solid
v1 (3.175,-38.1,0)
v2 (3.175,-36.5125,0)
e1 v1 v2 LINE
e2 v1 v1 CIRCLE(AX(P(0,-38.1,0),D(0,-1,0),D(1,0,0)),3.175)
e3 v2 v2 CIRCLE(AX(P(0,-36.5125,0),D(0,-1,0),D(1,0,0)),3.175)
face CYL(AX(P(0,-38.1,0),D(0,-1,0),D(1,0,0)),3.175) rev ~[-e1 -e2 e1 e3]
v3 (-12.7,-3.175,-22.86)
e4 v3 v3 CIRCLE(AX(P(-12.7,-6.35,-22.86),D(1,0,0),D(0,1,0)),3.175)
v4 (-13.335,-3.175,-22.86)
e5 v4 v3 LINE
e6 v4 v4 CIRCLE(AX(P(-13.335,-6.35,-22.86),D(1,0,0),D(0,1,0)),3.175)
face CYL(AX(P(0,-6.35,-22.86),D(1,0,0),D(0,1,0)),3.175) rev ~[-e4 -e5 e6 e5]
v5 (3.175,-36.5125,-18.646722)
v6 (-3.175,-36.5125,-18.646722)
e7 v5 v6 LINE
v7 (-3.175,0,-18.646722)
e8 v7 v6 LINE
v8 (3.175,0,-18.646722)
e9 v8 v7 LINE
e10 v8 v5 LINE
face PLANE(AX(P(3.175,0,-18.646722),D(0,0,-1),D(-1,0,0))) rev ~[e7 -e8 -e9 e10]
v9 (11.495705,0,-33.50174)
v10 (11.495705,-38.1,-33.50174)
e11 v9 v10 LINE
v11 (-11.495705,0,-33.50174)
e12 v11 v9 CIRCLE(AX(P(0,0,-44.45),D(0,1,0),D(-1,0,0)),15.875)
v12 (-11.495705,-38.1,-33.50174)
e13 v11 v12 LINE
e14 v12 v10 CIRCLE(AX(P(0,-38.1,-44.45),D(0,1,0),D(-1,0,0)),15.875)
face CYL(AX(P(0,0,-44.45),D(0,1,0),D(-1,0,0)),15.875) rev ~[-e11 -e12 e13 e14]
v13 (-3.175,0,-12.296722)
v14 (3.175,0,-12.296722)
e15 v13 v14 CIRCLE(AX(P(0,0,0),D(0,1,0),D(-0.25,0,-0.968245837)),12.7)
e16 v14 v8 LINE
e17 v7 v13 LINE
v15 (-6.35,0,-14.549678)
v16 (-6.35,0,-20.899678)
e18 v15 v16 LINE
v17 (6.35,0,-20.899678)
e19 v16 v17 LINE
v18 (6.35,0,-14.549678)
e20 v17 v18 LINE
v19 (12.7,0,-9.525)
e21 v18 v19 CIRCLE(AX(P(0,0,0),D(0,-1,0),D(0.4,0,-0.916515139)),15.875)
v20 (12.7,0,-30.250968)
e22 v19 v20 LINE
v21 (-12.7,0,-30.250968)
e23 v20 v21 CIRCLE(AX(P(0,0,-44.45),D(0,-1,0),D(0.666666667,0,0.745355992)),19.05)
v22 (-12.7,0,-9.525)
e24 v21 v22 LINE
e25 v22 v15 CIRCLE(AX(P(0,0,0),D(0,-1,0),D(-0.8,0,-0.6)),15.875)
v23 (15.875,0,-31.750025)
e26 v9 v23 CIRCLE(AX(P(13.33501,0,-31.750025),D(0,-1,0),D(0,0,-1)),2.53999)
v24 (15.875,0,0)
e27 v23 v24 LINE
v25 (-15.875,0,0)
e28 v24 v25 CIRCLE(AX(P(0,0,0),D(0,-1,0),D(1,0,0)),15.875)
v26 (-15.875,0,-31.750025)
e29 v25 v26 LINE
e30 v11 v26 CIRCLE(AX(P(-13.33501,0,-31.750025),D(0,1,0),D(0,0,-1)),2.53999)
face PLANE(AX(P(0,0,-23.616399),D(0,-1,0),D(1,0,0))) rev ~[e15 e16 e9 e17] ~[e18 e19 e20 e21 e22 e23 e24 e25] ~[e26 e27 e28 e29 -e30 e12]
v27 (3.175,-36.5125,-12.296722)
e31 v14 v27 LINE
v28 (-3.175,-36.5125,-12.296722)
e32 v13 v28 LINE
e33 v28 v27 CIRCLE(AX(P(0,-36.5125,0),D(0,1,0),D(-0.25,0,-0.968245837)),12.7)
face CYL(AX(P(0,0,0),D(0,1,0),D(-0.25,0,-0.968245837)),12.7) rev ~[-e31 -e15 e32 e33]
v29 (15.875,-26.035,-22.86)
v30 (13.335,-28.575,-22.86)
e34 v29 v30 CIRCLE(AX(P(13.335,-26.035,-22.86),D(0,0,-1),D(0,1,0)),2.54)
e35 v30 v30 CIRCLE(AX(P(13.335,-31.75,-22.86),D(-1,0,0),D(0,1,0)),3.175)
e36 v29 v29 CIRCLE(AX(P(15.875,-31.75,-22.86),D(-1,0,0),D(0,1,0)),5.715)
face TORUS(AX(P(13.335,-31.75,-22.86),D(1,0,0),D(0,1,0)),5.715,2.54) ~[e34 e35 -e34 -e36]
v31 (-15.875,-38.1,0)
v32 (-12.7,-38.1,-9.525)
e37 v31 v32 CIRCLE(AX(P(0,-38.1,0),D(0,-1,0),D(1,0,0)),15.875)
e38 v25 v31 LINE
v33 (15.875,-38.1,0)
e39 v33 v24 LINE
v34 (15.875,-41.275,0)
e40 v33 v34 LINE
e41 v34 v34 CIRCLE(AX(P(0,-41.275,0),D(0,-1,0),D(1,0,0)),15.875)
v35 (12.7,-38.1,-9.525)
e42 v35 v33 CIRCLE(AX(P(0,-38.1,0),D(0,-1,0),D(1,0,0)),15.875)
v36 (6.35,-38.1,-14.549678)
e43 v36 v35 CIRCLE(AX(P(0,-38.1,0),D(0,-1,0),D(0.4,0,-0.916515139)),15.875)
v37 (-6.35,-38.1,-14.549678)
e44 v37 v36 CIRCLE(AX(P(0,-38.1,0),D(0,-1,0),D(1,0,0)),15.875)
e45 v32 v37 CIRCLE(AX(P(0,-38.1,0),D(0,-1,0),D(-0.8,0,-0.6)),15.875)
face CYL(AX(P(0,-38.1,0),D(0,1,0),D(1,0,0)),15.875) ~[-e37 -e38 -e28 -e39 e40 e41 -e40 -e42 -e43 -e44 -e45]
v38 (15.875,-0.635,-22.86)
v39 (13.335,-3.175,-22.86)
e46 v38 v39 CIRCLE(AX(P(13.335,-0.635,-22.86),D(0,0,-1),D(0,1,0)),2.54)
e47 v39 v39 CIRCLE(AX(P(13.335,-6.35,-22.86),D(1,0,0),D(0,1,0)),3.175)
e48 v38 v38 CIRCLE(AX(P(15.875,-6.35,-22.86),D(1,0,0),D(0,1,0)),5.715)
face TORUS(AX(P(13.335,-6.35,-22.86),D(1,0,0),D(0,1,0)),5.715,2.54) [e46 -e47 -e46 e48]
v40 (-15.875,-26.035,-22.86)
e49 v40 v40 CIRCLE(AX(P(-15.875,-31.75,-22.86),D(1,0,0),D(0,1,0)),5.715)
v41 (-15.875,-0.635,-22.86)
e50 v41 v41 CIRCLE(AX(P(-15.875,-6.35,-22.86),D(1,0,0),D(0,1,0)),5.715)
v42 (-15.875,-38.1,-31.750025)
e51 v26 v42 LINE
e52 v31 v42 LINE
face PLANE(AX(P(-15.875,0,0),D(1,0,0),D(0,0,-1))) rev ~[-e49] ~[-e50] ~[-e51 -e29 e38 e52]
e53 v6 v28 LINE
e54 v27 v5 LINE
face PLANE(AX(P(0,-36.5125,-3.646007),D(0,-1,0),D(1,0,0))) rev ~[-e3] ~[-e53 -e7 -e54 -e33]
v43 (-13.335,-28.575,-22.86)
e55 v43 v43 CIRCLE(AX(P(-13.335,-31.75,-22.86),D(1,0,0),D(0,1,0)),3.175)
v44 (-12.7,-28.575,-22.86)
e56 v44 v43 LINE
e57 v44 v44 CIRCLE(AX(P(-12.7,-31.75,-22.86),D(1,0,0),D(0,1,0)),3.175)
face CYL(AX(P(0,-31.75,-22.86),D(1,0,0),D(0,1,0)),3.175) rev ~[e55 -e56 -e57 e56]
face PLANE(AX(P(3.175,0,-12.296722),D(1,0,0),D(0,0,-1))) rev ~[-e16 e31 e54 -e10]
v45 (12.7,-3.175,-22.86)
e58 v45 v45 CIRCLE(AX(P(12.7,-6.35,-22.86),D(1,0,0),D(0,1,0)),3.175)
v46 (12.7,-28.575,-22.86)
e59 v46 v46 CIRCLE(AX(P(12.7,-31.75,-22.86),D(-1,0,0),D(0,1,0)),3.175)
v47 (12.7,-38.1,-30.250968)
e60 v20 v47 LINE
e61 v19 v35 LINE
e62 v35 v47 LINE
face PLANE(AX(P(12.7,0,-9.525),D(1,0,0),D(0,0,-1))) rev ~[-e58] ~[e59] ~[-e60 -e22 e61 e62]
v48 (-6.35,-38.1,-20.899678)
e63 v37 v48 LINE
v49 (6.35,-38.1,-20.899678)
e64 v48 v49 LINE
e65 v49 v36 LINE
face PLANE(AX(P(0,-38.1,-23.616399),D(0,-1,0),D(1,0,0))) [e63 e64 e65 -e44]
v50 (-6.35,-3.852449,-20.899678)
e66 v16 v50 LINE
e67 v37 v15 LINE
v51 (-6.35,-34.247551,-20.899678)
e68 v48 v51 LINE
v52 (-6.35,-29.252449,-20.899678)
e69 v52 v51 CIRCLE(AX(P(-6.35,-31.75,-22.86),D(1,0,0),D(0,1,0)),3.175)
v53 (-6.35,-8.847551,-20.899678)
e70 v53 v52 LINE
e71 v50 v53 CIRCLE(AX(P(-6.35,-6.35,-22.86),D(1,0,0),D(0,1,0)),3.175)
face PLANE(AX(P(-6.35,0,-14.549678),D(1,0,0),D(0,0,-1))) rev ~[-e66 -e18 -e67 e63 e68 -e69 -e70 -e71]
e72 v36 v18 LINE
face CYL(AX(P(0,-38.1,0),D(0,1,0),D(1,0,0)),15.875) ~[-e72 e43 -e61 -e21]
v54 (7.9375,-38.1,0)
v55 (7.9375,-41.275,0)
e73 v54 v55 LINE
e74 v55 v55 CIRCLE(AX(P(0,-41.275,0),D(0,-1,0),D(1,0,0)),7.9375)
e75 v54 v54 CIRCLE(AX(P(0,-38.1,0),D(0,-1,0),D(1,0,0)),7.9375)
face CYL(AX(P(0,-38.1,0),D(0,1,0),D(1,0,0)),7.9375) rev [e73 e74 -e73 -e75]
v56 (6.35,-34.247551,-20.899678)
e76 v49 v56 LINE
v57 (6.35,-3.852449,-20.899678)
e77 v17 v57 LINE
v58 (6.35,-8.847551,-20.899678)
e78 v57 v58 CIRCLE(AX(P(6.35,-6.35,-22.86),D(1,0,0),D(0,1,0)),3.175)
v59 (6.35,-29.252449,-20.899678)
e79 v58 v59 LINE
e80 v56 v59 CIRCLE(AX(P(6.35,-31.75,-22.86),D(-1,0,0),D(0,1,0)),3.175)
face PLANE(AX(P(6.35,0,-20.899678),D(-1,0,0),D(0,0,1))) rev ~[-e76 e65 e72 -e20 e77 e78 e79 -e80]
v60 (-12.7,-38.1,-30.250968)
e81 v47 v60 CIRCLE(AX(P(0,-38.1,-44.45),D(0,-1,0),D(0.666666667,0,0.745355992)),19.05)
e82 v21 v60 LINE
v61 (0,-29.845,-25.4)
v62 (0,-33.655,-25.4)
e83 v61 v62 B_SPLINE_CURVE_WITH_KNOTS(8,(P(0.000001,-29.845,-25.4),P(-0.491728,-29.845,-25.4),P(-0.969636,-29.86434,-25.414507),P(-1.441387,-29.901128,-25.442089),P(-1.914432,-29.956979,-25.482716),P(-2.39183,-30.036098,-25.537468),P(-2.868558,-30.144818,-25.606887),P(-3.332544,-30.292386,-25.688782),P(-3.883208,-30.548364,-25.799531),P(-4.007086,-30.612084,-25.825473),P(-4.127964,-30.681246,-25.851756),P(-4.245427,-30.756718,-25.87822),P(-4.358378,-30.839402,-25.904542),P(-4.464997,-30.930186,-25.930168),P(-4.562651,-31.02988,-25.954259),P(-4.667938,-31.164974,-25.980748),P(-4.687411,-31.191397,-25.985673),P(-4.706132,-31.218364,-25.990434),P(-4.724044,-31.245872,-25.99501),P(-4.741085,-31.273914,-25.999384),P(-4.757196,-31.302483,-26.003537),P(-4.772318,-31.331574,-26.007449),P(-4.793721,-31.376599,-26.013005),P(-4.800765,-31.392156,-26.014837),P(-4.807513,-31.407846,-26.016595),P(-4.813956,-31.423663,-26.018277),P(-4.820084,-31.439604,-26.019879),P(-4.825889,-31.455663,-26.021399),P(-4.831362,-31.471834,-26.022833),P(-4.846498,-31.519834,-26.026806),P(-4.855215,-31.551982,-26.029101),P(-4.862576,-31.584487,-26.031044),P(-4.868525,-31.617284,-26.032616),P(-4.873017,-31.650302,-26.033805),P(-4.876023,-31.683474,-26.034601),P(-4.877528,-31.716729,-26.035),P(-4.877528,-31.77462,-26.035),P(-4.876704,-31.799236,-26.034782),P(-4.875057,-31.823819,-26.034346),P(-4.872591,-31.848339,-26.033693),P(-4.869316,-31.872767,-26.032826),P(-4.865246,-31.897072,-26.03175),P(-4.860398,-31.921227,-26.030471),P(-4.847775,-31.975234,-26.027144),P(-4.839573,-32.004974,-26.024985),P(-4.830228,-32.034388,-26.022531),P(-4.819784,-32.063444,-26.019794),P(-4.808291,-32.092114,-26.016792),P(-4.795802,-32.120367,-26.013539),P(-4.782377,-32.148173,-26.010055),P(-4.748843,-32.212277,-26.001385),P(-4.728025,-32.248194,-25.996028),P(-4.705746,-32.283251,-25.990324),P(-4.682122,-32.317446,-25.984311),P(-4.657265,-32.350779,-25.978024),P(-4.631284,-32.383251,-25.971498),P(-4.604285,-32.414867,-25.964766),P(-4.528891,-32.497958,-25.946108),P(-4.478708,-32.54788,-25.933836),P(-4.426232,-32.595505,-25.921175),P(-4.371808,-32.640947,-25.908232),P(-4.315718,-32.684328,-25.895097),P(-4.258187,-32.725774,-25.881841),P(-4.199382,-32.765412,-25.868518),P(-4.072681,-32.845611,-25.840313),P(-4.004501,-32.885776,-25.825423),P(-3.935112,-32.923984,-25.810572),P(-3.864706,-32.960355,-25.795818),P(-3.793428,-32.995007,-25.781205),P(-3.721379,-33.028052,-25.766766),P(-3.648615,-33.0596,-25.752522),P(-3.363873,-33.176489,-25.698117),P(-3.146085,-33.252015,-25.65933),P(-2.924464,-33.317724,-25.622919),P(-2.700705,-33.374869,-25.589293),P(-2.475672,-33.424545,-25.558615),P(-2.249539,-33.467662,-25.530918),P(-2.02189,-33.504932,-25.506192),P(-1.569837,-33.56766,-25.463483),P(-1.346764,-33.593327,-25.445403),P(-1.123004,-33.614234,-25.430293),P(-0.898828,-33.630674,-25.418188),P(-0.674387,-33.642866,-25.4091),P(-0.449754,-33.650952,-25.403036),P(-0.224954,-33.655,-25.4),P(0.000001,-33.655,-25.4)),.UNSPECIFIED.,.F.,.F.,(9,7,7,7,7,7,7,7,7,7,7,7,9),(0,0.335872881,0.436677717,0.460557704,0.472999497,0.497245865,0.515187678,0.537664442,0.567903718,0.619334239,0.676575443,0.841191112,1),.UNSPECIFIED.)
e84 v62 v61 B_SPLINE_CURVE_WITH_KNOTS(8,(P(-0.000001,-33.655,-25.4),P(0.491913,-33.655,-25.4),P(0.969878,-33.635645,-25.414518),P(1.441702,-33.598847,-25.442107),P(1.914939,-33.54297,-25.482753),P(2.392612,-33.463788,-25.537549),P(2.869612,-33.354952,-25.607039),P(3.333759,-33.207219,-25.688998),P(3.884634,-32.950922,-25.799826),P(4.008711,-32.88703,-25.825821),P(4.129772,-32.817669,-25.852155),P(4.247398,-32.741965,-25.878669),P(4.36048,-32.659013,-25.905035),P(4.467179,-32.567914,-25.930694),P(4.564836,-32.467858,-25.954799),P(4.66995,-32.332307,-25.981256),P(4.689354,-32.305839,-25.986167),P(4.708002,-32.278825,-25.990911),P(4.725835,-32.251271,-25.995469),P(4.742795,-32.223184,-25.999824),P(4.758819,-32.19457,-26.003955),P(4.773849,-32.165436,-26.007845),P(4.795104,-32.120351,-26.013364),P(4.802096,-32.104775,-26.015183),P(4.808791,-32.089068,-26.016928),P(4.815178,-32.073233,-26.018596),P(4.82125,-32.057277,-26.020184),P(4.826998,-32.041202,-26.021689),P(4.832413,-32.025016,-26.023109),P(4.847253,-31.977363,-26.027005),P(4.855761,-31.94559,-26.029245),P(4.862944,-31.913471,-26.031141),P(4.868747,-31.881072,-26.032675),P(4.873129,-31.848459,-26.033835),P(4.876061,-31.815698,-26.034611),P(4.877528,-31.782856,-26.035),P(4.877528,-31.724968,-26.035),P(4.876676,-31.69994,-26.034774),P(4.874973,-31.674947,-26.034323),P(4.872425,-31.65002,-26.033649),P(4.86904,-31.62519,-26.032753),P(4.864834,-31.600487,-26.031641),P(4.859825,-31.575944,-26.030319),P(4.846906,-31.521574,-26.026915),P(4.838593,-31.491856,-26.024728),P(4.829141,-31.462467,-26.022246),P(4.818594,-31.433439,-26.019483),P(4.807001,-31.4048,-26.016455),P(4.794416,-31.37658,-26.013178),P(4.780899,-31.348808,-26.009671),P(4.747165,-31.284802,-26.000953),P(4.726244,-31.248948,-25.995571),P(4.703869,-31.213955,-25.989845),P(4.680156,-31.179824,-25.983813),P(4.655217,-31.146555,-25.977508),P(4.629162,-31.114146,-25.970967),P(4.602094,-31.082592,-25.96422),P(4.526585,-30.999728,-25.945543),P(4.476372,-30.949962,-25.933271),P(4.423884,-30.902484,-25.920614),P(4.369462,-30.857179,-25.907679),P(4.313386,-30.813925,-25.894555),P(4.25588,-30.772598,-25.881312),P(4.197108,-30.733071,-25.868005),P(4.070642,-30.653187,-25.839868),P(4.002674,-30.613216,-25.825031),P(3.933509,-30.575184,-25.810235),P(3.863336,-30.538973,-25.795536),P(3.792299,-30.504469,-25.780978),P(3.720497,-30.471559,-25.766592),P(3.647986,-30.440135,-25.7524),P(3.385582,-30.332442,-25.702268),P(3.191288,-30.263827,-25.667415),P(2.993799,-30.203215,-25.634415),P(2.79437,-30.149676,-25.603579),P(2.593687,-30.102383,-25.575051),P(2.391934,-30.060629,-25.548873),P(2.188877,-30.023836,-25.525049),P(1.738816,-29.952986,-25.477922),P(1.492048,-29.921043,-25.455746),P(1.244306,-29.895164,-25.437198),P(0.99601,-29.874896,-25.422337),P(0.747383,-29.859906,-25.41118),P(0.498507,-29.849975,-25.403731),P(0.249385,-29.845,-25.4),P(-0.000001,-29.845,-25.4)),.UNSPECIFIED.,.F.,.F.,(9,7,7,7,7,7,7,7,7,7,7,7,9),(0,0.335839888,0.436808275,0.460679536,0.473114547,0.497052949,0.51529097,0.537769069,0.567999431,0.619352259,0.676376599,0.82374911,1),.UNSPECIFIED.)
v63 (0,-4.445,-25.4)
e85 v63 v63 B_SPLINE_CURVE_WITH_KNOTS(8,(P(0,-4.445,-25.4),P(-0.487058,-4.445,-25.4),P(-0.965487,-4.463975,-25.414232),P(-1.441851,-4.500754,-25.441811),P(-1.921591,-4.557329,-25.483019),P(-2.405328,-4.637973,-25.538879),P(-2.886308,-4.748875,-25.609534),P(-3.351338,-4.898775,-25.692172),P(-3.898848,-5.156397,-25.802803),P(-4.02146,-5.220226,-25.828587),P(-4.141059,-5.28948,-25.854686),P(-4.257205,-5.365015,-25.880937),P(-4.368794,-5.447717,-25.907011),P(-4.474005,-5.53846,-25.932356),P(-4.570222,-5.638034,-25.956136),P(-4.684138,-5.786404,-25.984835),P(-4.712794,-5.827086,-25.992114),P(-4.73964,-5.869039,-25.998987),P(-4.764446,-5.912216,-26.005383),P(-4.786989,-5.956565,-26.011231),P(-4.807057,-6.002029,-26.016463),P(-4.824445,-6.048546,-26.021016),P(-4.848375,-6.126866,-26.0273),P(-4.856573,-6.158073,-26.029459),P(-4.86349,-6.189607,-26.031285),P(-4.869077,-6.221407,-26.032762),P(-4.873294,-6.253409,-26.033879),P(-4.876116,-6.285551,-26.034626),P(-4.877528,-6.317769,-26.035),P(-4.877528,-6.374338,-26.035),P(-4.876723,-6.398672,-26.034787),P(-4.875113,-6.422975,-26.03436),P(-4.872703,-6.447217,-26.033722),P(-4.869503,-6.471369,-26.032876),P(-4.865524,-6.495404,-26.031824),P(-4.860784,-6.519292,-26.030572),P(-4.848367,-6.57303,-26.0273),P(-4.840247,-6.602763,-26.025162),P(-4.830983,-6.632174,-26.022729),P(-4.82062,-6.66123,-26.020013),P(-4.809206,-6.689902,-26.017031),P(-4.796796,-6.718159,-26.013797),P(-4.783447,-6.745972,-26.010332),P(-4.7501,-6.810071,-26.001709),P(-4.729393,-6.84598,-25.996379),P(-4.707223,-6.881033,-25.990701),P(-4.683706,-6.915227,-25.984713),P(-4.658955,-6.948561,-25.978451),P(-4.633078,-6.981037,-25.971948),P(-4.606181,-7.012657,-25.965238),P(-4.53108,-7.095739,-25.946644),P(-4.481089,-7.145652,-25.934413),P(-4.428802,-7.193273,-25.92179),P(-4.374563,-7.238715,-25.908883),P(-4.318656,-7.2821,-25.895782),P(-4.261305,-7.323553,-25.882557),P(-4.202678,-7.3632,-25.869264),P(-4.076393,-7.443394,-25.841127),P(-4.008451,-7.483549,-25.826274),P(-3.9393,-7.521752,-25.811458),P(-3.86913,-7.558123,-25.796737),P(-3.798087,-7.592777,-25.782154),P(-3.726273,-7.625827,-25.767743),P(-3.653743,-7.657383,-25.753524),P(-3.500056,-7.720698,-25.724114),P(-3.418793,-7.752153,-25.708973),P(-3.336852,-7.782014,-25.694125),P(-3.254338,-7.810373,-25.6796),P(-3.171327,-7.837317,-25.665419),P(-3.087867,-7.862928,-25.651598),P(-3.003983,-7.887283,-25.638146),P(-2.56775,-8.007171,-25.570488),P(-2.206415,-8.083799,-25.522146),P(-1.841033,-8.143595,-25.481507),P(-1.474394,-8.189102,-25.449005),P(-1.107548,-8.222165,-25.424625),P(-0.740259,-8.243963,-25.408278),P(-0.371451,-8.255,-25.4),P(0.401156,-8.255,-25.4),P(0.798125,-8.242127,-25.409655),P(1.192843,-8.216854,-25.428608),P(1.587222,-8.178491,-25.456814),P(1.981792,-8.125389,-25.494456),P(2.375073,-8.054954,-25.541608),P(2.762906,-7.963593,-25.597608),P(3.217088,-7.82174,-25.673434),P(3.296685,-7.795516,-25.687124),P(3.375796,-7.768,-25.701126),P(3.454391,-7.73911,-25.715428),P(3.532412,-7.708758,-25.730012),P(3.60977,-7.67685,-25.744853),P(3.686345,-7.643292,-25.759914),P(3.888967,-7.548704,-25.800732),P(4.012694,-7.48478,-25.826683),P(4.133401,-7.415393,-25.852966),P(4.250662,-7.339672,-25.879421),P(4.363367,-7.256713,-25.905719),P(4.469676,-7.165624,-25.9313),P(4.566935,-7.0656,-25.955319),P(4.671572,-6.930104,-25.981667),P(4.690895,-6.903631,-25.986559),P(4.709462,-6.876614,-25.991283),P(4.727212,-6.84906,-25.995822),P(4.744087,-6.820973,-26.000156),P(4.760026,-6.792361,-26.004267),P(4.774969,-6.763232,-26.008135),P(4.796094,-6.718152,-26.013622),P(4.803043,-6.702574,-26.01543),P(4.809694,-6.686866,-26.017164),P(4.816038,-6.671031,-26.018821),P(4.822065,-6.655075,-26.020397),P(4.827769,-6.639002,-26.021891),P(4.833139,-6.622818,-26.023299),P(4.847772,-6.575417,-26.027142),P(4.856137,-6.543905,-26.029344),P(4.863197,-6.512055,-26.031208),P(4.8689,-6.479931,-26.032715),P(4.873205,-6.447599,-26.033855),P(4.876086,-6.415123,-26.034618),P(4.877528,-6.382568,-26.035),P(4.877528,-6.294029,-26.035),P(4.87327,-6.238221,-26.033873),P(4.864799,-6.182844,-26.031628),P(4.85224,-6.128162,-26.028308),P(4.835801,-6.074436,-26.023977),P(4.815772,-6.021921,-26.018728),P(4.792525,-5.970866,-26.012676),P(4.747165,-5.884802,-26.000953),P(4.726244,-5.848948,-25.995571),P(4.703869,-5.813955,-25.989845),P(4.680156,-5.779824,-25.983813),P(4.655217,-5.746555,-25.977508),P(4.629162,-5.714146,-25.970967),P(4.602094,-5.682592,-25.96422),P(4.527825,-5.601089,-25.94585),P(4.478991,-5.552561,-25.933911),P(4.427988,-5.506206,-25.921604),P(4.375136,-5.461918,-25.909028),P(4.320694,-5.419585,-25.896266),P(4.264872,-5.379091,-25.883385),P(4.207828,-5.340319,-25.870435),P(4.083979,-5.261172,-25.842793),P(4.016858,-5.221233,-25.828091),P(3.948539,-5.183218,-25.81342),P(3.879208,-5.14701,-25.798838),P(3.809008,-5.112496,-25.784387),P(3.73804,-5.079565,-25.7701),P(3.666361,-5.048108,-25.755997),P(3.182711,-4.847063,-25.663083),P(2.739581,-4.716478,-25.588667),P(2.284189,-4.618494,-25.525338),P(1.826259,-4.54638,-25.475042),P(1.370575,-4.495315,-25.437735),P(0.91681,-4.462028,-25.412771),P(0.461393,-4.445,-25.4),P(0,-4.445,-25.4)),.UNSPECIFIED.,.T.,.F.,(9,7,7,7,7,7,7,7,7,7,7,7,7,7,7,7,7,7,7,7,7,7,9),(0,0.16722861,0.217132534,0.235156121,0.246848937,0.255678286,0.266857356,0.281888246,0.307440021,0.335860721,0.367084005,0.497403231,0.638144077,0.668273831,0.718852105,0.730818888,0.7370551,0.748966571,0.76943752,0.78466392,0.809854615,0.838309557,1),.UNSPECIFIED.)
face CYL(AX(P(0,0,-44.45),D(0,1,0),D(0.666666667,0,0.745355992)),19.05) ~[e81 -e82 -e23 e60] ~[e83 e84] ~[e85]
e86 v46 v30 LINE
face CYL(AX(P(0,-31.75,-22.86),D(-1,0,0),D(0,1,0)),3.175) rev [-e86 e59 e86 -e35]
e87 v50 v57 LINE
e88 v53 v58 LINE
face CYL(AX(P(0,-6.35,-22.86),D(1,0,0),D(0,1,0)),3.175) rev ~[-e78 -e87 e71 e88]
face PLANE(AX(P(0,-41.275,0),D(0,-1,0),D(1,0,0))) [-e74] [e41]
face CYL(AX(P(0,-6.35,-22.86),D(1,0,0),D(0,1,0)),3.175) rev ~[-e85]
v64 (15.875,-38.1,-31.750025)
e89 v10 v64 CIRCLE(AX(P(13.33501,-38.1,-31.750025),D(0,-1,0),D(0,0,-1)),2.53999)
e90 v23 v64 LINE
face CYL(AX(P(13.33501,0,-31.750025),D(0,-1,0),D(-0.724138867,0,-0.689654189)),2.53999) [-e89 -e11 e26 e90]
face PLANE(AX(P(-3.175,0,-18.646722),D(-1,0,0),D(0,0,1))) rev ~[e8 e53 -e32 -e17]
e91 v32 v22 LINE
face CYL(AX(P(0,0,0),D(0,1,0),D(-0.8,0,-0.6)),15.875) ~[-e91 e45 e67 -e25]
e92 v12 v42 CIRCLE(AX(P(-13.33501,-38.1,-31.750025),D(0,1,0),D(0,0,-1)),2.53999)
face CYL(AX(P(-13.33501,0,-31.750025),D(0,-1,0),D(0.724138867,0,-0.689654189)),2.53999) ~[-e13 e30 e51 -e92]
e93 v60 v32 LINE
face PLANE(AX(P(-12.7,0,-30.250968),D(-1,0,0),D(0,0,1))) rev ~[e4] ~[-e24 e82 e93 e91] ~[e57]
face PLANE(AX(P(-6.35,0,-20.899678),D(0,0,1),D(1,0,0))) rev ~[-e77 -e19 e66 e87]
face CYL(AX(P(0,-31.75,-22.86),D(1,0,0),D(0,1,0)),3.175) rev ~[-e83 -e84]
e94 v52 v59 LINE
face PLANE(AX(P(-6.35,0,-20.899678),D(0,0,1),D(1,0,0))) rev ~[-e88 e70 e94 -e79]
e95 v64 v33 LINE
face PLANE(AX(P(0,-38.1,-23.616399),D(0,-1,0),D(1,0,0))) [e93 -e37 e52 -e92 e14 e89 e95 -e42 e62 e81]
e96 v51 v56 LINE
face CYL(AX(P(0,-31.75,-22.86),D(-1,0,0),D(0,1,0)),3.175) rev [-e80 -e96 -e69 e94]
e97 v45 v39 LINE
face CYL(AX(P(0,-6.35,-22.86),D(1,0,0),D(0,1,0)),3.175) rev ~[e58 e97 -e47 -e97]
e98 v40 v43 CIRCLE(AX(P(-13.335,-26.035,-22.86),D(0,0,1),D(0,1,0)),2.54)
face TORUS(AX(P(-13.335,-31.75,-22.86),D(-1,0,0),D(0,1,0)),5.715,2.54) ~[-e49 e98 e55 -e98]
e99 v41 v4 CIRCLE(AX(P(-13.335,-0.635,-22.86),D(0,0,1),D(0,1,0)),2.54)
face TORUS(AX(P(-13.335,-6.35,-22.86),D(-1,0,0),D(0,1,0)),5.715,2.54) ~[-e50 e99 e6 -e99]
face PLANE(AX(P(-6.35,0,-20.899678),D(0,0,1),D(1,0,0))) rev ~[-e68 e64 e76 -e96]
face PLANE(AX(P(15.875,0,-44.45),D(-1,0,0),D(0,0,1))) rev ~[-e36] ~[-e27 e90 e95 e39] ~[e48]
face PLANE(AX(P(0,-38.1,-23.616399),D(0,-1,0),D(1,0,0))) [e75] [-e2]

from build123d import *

# Parameters (mm, degrees)
F1_DEPTH = 38.1
F2_R     = 3.175
F3_DEPTH = 25.4
F4_R     = 2.53999
F5_R     = 2.54
F6_R     = 3.175
F7_DEPTH = 1.5875
F8_R     = 15.875
F8_R_2   = 7.9375
F9_DEPTH = 3.175


# Not quite as in the source:
# - a fillet or chamfer is up to 0.001 mm smaller than in the source, because OpenCascade refuses the exact size
# - a feature names something its author has since deleted; it is built from what else it names


with BuildPart() as f1:
    # F0 (on Front) → F1 (new body)
    with BuildSketch(Plane.XZ):
        with BuildLine():
            ThreePointArc((-15.875, -44.45), (0, -28.575), (15.875, -44.45))
            Line((15.875, -44.45), (15.875, 0))
            ThreePointArc((15.875, 0), (15.0603473566, -5.0201157855), (12.7, -9.525))
            Line((12.7, -9.525), (12.7, -30.2509683429))
            ThreePointArc((12.7, -30.2509683429), (0, -25.4), (-12.7, -30.2509683429))
            Line((-12.7, -30.2509683429), (-12.7, -9.525))
            ThreePointArc((-12.7, -9.525), (-15.0603473566, -5.0201157855), (-15.875, 0))
            Line((-15.875, 0), (-15.875, -44.45))
        make_face()
        with BuildLine():
            ThreePointArc((12.7, -9.525), (15.0603473566, -5.0201157855), (15.875, 0))
            ThreePointArc((15.875, 0), (0, 15.875), (-15.875, 0))
            ThreePointArc((-15.875, 0), (-15.0603473566, -5.0201157855), (-12.7, -9.525))
            ThreePointArc((-12.7, -9.525), (-9.8507599619, -12.4490221774), (-6.35, -14.5496778315))
            Line((-6.35, -14.5496778315), (-6.35, -20.8996778315))
            Line((-6.35, -20.8996778315), (6.35, -20.8996778315))
            Line((6.35, -20.8996778315), (6.35, -14.5496778315))
            ThreePointArc((6.35, -14.5496778315), (9.8507599619, -12.4490221774), (12.7, -9.525))
        make_face()
        with BuildLine():
            Line((-3.175, -18.6467221242), (-3.175, -12.2967221242))
            ThreePointArc((-3.175, -12.2967221242), (0, 12.7), (3.175, -12.2967221242))
            Line((3.175, -12.2967221242), (3.175, -18.6467221242))
            Line((3.175, -18.6467221242), (-3.175, -18.6467221242))
        make_face(mode=Mode.SUBTRACT)
    extrude(amount=F1_DEPTH)

    # F2 (on Right) → F3 (cut, symmetric)
    with BuildSketch(Plane.YZ):
        with Locations((-31.75, -22.86)):
            Circle(F2_R)
        with Locations((-6.35, -22.86)):
            Circle(F2_R)
    extrude(amount=F3_DEPTH, both=True, mode=Mode.SUBTRACT)

    # F4 (radius 2.54 in the source; OpenCascade refuses exactly that, so slightly less here)
    f4_edges = [f1.edges().sort_by_distance(p)[0] for p in [
        (15.875, -19.05, -44.45),
        (-15.875, -19.05, -44.45),
    ]]
    fillet(f4_edges, radius=F4_R)

    # F5
    f5_edges = [f1.edges().sort_by_distance(p)[0] for p in [
        (-15.875, -9.525, -22.86),
        (-15.875, -34.925, -22.86),
        (15.875, -34.925, -22.86),
        (15.875, -9.525, -22.86),
    ]]
    fillet(f5_edges, radius=F5_R)

    # F6 (on face) → F7 (join)
    with BuildSketch(Plane.XZ.offset(38.1)):
        with BuildLine():
            ThreePointArc((6.35, -14.5496778315), (0, 15.875), (-6.35, -14.5496778315))
            Line((-6.35, -14.5496778315), (-6.35, -20.8996778315))
            Line((-6.35, -20.8996778315), (6.35, -20.8996778315))
            Line((6.35, -20.8996778315), (6.35, -14.5496778315))
        make_face()
        Circle(F6_R, mode=Mode.SUBTRACT)
    extrude(amount=-F7_DEPTH)

    # F8 (on face) → F9 (join)
    with BuildSketch(Plane.XZ.offset(38.1)):
        Circle(F8_R)
        Circle(F8_R_2, mode=Mode.SUBTRACT)
    extrude(amount=F9_DEPTH)


solid = f1.part
